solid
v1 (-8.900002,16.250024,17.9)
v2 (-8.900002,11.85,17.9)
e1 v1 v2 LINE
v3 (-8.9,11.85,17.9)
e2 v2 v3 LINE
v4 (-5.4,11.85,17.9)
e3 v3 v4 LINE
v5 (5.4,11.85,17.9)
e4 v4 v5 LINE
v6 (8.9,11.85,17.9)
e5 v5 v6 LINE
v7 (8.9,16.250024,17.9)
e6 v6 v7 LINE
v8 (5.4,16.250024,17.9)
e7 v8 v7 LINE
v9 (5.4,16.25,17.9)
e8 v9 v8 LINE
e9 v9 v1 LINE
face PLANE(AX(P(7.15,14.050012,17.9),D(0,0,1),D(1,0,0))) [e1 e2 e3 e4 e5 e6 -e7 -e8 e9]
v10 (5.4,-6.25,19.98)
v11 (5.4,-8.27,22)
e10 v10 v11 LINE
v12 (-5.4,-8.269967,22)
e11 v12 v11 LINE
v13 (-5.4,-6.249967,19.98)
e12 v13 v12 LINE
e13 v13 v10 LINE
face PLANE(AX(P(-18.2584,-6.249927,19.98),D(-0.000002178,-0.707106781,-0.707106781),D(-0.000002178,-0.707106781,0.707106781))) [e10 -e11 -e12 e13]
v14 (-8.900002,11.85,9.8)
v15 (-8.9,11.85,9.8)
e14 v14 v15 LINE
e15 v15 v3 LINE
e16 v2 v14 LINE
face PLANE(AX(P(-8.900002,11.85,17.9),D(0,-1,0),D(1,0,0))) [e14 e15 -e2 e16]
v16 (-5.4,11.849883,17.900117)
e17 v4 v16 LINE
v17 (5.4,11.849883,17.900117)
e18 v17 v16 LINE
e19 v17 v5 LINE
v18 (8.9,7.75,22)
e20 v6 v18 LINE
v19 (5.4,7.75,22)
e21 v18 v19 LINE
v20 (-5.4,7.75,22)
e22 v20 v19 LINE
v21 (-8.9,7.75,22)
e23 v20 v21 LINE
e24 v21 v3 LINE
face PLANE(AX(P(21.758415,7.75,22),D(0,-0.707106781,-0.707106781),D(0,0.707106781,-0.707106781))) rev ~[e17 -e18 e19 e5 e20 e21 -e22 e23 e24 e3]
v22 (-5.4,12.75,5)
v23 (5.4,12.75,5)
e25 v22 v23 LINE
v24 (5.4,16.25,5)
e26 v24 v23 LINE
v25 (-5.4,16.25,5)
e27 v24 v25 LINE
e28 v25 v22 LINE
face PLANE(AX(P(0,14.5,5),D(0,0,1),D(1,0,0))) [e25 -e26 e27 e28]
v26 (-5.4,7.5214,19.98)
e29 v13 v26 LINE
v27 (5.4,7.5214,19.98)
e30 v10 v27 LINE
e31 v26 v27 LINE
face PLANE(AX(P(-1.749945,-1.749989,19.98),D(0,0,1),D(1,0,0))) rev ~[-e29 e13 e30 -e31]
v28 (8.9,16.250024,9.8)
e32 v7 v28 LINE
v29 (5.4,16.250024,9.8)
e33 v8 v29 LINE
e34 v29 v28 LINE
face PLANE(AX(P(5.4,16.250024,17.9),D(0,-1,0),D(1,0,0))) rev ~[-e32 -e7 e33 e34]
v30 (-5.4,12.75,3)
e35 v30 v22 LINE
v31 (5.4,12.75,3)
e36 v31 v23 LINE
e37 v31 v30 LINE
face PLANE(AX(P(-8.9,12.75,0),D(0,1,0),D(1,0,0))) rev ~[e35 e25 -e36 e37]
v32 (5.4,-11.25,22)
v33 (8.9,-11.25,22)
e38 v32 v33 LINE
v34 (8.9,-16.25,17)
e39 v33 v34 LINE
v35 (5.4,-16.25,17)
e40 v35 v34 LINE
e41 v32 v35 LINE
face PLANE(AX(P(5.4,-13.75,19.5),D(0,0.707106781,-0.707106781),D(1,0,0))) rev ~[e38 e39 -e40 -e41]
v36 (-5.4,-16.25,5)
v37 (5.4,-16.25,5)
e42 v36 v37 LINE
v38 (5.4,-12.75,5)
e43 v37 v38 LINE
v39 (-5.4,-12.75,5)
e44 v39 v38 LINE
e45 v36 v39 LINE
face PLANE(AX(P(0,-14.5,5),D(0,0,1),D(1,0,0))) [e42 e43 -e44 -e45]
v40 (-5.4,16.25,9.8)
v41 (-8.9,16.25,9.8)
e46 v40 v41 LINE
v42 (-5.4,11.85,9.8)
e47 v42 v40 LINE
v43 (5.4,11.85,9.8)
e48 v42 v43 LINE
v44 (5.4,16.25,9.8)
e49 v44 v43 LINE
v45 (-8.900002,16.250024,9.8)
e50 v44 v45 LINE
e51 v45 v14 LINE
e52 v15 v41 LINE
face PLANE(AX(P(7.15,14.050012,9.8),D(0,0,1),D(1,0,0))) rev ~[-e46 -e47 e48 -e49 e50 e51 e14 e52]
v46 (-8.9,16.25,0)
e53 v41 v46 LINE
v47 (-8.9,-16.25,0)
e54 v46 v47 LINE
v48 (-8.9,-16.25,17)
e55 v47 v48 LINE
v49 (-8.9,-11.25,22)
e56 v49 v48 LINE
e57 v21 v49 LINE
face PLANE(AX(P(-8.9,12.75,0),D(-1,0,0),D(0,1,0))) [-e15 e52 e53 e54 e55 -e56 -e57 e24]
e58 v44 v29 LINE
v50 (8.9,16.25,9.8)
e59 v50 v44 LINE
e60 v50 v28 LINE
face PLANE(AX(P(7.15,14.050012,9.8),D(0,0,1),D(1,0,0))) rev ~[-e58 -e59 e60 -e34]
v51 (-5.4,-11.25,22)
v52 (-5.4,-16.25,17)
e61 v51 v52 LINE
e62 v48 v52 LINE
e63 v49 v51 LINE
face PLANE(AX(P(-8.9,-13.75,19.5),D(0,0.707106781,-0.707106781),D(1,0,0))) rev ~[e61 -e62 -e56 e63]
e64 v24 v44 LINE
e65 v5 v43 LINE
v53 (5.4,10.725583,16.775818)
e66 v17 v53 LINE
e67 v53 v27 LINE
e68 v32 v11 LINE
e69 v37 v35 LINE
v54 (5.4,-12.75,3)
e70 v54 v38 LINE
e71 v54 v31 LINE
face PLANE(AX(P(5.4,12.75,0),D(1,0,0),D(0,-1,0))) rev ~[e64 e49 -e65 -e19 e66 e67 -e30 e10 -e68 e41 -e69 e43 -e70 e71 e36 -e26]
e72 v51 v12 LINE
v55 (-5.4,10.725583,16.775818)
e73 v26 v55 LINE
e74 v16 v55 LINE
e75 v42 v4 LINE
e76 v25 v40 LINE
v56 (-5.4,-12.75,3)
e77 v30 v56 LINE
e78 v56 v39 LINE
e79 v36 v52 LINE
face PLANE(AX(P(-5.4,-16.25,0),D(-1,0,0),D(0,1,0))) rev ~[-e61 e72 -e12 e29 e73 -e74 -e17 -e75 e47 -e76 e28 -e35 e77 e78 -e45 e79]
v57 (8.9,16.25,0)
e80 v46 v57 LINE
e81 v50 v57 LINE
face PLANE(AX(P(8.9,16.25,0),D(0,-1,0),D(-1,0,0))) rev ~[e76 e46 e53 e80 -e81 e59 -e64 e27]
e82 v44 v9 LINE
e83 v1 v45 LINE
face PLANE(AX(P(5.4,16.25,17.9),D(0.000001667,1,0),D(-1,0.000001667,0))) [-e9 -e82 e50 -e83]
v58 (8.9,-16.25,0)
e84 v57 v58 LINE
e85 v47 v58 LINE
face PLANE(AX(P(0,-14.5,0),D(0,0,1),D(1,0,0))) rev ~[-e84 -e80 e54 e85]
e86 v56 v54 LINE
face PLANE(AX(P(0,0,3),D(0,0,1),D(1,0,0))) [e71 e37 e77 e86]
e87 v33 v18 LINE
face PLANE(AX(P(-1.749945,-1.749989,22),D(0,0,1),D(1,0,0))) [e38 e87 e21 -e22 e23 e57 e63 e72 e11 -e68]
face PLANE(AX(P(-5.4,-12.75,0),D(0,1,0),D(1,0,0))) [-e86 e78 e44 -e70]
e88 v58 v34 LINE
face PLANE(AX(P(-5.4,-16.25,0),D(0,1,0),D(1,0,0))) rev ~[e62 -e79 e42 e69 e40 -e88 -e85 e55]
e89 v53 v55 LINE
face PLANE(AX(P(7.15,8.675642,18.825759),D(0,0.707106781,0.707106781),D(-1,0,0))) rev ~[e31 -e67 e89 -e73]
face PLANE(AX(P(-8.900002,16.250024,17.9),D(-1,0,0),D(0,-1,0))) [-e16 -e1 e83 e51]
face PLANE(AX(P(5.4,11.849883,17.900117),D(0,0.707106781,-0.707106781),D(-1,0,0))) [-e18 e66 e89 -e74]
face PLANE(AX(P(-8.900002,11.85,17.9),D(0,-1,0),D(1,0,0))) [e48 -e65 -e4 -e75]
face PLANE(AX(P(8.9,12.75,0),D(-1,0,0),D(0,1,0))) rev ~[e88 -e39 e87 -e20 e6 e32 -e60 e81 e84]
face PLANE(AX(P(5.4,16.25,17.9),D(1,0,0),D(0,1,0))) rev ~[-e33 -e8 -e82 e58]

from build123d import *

# Parameters (mm, degrees)
F1_DEPTH     = 3
F0_W         = 3.4999997824
F0_H         = 12.75
F2_DEPTH     = 22
F0_W_2       = 10.8
F0_H_2       = 3.4999997824
F3_DEPTH     = 5
F4_SIZE      = 5
F5_DEPTH     = 17.9
F6_T4_DEPTH  = 29.2168296621
F6_T9_DEPTH  = 29.2168296621
F7_W         = 3.4999997824
F7_H         = 4.4000236183
F8_DEPTH     = 8.1
F9_W         = 3.4999997824
F9_H         = 5.7981096033
F9_H_2       = 0.0001660025
F9_W_2       = 14.2999671862
F10_DEPTH    = 1.59
F11_DEPTH    = 5
F13_DEPTH    = 2.02
F14_T4_DEPTH = 36.5168298797


# Not quite as in the source:
# - a fillet or chamfer that OpenCascade refuses, or shapes differently, is made with other operations: its cross-section is extruded or revolved along the edge and cut away or added
# - ends of sketch curves that miss each other by under 0.0002 mm in the source are joined


with BuildPart() as f1:
    # F0 (on Top) → F1 (new body)
    with BuildSketch(Plane.XY):
        Polygon((5.4, 0), (5.4, 12.75), (-5.4, 12.75), (-5.4, 0), (-5.4, -12.75), (5.4, -12.75), align=None)
    extrude(amount=F1_DEPTH)

    # F0 (on Top) → F2 (join)
    with BuildSketch(Plane.XY):
        with Locations((-7.1499998912, 6.375)):
            Rectangle(F0_W, F0_H)
        with Locations((7.1499998912, 6.375)):
            Rectangle(F0_W, F0_H)
        Polygon((-5.4, -12.75), (-5.4, 0), (-8.8999997824, 0), (-8.8999997824, -16.2499997824), (-5.4, -16.2499997824), align=None)
        Polygon((8.8999997824, 0), (5.4, 0), (5.4, -12.75), (5.4, -16.2499997824), (8.8999997824, -16.2499997824), align=None)
    extrude(amount=F2_DEPTH)

    # F0 (on Top) → F3 (join)
    with BuildSketch(Plane.XY):
        with Locations((0, 14.4999998912)):
            Rectangle(F0_W_2, F0_H_2)
        with Locations((-7.1499998912, 14.4999998912)):
            Rectangle(F0_W, F0_H_2)
        with Locations((7.1499998912, 14.4999998912)):
            Rectangle(F0_W, F0_H_2)
    extrude(amount=F3_DEPTH)

    # F4
    f4_edges = [f1.edges().sort_by_distance(p)[0] for p in [
        (-7.15, -16.25, 22),
        (7.15, -16.25, 22),
    ]]
    chamfer(f4_edges, length=F4_SIZE)

    # F0 (on Top) → F5 (join)
    with BuildSketch(Plane.XY):
        with Locations((-7.1499998912, 14.4999998912)):
            Rectangle(F0_W, F0_H_2)
        with Locations((7.1499998912, 14.4999998912)):
            Rectangle(F0_W, F0_H_2)
    extrude(amount=F5_DEPTH)

    # F6: chamfer of 5 on 2 edges, made by hand


with BuildPart() as f6_tool2:
    # F6_s3 → F6_t4 (new body)
    with BuildSketch(Plane.YZ.offset(21.7584147223)):
        Polygon((7.75, 22), (12.75, 17), (12.75, 22), align=None)
    extrude(amount=-F6_T4_DEPTH)

    split(bisect_by=Plane.XY.offset(17.9), keep=Keep.TOP)


with BuildPart() as f1_1:
    add(f1.part)

    # F6_t1: cut F6_tool2
    add(f6_tool2.part, mode=Mode.SUBTRACT)


with BuildPart() as f6_tool7:
    # F6_s8 → F6_t9 (new body)
    with BuildSketch(Plane.YZ.offset(7.4584149398)):
        Polygon((12.75, 17), (7.75, 22), (12.75, 22), align=None)
    extrude(amount=-F6_T9_DEPTH)

    split(bisect_by=Plane.XY.offset(17.9), keep=Keep.TOP)


with BuildPart() as f1_2:
    add(f1_1.part)

    # F6_t6: cut F6_tool7
    add(f6_tool7.part, mode=Mode.SUBTRACT)

    # F7 (on face) → F8 (join)
    with BuildSketch(Plane.XY.offset(17.9)):
        with Locations((7.1499998912, 14.0500118092)):
            Rectangle(F7_W, F7_H)
        Polygon((-8.9000016451, 11.85), (5.4, 11.85), (5.4, 16.2499997824), (-8.9000016451, 16.2500236183), align=None)
    extrude(amount=-F8_DEPTH)

    # F9 (on face) → F10 (join)
    with BuildSketch(Plane(origin=(0, 14.875, 14.875), x_dir=(-1, 0, 0), z_dir=(0, 0.7071067812, 0.7071067812))):
        with Locations((-7.1499998912, 7.1772168303)):
            Rectangle(F9_W, F9_H)
        with Locations((-7.1499998912, 4.2780790274)):
            Rectangle(F9_W, F9_H_2)
        with Locations((1.7499835931, 7.1772168303)):
            Rectangle(F9_W_2, F9_H)
    extrude(amount=-F10_DEPTH)

    # F0 (on Top) → F11 (join)
    with BuildSketch(Plane.XY):
        with Locations((0, -14.4999998912)):
            Rectangle(F0_W_2, F0_H_2)
    extrude(amount=F11_DEPTH)

    # F12 (on face) → F13 (join)
    with BuildSketch(Plane.XY.offset(22)):
        Polygon((5.4, -11.2499997824), (5.4, 7.75), (-8.8998991996, 7.75), (-8.8998991996, -11.2499557436), align=None)
    extrude(amount=-F13_DEPTH)

    # F14: chamfer of 5 on 1 edges, made by hand


with BuildPart() as f14_tool2:
    # F14_s3 → F14_t4 (new body)
    with BuildSketch(Plane(origin=(-18.2583802936, 5.62297e-05, 0), x_dir=(0, 0, 1), z_dir=(1, -3.0797e-06, 0))):
        Polygon((19.98, 6.2499831522), (24.98, 11.2499831522), (19.98, 11.2499831522), align=None)
    extrude(amount=F14_T4_DEPTH)

    split(bisect_by=Plane.YZ.offset(5.4), keep=Keep.BOTTOM)

    split(bisect_by=Plane.YZ.offset(-5.4), keep=Keep.TOP)


with BuildPart() as f1_3:
    add(f1_2.part)

    # F14_t1: cut F14_tool2
    add(f14_tool2.part, mode=Mode.SUBTRACT)


solid = f1_3.part
